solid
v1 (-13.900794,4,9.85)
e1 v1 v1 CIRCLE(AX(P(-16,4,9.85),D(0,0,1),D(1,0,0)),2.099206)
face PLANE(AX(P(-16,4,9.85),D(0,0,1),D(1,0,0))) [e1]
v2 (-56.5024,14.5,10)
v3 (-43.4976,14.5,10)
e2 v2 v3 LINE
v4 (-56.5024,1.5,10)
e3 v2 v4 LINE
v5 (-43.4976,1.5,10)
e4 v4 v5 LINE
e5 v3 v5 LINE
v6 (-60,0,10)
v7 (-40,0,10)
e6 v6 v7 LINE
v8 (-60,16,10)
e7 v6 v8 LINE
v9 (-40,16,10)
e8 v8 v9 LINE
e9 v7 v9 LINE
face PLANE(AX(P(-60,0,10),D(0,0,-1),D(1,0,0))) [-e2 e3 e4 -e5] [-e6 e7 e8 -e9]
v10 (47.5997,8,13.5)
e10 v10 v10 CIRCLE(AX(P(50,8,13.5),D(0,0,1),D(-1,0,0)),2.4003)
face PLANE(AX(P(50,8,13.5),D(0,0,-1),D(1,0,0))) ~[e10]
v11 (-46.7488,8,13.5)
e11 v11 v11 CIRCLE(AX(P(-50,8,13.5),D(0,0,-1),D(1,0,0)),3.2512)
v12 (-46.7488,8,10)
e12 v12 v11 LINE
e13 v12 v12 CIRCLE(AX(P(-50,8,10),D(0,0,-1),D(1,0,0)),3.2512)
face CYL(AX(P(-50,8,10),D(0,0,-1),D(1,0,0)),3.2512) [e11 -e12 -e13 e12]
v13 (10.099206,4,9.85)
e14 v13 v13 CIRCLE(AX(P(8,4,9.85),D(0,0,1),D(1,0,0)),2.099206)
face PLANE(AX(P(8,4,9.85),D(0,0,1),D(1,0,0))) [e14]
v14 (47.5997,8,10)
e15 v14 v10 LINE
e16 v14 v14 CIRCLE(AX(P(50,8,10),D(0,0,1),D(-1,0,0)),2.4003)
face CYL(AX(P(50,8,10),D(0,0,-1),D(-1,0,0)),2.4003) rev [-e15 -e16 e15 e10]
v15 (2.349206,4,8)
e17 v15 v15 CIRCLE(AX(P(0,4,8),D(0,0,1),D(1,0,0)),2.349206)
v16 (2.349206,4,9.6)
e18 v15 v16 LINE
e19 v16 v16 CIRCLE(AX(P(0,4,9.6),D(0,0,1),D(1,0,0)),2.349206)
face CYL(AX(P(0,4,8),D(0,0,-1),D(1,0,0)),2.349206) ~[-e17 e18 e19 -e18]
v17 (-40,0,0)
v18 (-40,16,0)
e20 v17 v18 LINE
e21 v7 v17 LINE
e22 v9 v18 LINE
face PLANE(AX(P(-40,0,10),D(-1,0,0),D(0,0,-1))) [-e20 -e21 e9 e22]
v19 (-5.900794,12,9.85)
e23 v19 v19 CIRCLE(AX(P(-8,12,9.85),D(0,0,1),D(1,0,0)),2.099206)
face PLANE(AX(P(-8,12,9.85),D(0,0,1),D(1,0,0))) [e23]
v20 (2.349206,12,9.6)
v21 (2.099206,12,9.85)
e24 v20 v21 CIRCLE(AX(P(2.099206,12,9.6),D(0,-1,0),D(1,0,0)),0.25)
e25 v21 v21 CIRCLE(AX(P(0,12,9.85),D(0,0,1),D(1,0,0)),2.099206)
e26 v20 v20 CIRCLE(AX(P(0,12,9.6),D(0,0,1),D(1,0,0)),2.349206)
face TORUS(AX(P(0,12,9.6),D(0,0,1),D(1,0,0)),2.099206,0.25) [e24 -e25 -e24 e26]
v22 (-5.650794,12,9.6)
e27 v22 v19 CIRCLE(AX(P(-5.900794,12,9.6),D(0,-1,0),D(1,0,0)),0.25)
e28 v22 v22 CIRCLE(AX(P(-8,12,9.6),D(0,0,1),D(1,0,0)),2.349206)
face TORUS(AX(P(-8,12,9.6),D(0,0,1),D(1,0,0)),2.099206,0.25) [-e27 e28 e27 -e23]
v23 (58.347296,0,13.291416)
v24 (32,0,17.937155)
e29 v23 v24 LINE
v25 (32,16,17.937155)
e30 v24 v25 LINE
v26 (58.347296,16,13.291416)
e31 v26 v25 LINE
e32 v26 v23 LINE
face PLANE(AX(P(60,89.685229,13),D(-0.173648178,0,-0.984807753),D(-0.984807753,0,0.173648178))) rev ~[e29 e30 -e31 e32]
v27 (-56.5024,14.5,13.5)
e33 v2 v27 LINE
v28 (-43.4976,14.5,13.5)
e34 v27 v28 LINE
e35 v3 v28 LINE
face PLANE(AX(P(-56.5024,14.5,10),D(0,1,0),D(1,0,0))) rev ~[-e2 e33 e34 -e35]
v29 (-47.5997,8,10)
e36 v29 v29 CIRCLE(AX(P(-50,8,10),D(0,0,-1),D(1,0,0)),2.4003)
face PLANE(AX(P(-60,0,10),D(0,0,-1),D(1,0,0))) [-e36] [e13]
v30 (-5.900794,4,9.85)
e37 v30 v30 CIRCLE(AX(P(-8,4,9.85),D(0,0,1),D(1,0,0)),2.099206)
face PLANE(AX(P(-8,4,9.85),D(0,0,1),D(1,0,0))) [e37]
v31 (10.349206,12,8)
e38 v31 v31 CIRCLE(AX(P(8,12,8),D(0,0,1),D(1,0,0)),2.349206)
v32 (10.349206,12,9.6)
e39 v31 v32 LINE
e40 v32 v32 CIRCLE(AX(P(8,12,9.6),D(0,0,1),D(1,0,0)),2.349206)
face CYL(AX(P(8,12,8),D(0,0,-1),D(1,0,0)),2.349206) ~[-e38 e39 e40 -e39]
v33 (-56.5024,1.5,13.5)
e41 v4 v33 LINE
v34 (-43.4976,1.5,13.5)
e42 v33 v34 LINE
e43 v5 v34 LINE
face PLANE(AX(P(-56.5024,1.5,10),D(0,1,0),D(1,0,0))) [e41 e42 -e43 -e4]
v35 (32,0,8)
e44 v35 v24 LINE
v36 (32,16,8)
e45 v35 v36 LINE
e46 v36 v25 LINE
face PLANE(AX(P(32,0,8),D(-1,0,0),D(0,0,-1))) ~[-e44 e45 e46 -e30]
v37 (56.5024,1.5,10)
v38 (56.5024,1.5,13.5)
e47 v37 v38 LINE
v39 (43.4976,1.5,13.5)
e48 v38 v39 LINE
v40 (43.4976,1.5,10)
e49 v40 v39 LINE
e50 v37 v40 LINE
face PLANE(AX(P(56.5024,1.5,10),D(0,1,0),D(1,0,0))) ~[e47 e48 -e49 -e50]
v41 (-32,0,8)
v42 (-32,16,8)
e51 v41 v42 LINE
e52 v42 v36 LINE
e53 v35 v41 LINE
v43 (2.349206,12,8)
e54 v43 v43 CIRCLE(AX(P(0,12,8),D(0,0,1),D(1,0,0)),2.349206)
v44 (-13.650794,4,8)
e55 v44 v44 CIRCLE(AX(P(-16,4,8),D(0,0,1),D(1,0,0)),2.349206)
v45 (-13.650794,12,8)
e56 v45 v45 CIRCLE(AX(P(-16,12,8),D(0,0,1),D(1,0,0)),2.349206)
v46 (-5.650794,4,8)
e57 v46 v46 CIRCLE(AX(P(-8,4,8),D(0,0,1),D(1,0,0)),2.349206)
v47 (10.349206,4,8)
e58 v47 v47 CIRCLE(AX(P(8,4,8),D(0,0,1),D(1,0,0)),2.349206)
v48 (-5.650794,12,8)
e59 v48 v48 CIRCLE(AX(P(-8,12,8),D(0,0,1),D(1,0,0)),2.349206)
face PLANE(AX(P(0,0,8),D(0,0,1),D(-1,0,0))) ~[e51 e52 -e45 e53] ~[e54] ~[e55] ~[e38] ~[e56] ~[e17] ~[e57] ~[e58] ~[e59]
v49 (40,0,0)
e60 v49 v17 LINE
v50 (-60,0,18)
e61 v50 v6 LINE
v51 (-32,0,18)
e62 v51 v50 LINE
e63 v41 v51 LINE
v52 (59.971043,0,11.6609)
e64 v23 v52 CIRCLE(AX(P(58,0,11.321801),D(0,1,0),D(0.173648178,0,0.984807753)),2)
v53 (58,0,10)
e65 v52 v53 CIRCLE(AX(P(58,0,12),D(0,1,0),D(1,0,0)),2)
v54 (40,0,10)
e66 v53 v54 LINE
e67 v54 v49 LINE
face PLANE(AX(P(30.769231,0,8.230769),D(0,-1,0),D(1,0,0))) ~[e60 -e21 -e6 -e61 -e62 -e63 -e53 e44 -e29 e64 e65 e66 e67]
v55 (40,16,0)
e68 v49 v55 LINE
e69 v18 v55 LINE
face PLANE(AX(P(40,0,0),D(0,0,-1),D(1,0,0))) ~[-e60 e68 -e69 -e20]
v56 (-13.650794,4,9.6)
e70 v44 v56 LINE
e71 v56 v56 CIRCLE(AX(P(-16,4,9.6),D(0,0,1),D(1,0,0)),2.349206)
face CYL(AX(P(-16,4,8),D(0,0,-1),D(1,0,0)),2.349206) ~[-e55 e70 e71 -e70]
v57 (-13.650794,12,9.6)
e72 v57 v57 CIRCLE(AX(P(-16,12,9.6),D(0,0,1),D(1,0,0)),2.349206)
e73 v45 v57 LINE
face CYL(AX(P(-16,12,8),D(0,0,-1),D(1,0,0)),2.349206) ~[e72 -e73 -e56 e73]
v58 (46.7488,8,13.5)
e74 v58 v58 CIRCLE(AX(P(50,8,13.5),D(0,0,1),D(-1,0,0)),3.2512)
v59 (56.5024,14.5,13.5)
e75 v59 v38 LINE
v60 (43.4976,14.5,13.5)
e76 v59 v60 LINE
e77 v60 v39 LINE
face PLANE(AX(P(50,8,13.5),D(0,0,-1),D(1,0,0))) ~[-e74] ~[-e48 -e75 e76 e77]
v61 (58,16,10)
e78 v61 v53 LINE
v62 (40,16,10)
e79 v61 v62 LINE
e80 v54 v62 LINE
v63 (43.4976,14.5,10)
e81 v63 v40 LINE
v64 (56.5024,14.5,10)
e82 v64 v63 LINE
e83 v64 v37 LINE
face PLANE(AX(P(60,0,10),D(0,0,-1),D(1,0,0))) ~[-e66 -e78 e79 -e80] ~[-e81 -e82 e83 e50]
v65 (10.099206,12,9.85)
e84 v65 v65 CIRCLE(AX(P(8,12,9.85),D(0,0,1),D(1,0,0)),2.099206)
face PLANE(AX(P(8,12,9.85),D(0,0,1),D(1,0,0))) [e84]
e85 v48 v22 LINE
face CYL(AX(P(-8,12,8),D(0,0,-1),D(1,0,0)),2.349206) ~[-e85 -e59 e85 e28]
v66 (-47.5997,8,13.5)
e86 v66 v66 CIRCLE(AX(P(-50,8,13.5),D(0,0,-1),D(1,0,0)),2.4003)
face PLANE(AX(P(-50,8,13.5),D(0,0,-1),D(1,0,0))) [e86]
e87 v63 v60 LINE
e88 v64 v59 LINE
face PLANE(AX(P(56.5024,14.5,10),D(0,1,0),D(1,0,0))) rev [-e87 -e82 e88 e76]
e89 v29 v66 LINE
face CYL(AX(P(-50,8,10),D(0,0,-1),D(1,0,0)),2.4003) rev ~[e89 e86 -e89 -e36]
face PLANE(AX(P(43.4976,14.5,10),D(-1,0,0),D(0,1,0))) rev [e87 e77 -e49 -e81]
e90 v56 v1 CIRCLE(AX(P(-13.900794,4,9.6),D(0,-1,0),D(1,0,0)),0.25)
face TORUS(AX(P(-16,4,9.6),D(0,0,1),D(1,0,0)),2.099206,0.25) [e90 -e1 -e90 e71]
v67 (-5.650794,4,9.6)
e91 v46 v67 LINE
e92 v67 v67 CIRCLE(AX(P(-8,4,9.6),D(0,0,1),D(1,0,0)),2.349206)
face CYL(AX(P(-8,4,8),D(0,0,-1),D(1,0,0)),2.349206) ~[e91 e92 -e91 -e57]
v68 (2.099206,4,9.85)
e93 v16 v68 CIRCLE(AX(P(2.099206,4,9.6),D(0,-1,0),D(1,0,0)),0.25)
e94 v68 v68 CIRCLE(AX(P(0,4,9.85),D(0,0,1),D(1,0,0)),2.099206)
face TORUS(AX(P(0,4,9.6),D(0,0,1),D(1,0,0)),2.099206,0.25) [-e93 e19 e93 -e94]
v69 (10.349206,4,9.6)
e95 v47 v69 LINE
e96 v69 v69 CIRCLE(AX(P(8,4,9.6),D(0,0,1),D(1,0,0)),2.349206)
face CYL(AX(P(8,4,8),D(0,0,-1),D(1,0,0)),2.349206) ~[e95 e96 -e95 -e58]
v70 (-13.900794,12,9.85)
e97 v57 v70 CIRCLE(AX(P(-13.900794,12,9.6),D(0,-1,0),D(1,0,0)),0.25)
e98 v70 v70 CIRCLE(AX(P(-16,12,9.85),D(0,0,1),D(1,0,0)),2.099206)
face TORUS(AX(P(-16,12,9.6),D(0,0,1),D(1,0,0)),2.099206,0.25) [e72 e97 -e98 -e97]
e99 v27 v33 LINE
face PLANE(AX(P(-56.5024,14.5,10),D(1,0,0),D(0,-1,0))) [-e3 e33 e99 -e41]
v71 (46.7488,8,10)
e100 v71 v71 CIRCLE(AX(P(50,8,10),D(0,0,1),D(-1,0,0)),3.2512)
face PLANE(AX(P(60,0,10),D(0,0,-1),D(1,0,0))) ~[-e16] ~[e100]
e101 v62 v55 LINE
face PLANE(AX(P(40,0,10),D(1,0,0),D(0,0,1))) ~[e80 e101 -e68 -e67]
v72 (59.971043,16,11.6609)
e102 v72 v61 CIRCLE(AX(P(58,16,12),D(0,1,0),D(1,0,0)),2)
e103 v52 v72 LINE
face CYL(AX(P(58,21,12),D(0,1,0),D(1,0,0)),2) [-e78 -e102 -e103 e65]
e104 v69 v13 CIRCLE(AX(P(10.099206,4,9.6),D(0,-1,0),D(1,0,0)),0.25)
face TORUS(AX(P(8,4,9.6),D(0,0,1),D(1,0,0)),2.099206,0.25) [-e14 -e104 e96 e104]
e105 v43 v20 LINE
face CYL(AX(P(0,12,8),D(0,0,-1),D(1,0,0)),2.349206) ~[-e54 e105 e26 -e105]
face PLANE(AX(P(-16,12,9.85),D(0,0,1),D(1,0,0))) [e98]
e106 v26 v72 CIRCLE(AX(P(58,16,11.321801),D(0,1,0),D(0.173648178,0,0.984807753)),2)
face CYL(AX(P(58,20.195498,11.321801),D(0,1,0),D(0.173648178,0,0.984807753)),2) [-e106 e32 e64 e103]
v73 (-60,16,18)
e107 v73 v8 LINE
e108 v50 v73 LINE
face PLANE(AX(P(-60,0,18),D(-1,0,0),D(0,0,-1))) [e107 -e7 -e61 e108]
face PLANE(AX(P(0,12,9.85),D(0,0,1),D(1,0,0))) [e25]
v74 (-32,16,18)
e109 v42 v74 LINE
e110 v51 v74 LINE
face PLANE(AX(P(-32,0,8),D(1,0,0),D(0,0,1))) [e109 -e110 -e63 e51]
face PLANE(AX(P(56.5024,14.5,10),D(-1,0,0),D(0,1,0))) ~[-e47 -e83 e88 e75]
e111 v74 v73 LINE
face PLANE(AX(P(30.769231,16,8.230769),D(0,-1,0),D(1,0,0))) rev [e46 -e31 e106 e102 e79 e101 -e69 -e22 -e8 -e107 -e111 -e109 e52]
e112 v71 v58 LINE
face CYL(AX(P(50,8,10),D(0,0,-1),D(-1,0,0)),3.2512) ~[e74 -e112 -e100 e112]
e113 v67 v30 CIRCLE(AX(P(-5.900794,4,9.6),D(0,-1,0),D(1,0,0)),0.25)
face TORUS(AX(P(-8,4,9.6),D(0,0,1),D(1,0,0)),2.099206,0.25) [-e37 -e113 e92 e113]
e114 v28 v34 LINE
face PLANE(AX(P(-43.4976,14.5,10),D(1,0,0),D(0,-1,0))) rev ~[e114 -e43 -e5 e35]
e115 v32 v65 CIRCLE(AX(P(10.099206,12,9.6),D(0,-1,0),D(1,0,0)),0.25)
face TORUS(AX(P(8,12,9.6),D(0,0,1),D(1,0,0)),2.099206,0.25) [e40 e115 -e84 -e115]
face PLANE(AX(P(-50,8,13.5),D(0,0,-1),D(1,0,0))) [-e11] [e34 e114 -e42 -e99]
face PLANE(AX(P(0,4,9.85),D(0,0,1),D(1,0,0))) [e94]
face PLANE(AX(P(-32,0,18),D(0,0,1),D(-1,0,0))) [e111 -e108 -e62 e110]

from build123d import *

# Parameters (mm, degrees)
F1_DEPTH    = 16
F2_W        = 13.0048
F2_H        = 13
F2_R        = 3.2512
F2_R_2      = 2.4003
F3_DEPTH    = 3.5
F5_R        = 2.3492063492
F6_DEPTH    = 1.85
F7_T1_DEPTH = 163.3704583371
F8_T1_DEPTH = 24.3909963118
F8_T3_DEPTH = 26
F9_R        = 0.25


# Not quite as in the source:
# - a fillet or chamfer that OpenCascade refuses, or shapes differently, is made with other operations: its cross-section is extruded or revolved along the edge and cut away or added
# - a feature names something its author has since deleted; it is built from what else it names


with BuildPart() as f1:
    # F0 (on Front) → F1 (new body)
    with BuildSketch(Plane.XZ):
        Polygon((-40, 0), (0, 0), (0, 8), (-32, 8), (-32, 18), (-60, 18), (-60, 10), (-40, 10), align=None)
    extrude(amount=-F1_DEPTH)

    # F2 (on face) → F3 (cut)
    with BuildSketch(Plane(origin=(0, 0, 10), x_dir=(1, 0, 0), z_dir=(0, 0, -1))):
        with Locations((-50, -8)):
            Rectangle(F2_W, F2_H)
        with Locations((-50, -8)):
            Circle(F2_R, mode=Mode.SUBTRACT)
        with Locations((-50, -8)):
            Circle(F2_R_2)
    extrude(amount=-F3_DEPTH, mode=Mode.SUBTRACT)

    # F4: F1 across face


with BuildPart() as f1_1:
    add(f1.part)
    add(f1.part.mirror(Plane(origin=(0, 8, 4), x_dir=(0, 1, 0), z_dir=(1, 0, 0))))

    # F5 (on face) → F6 (join)
    with BuildSketch(Plane.XY.offset(8)):
        with Locations((-16, 4)):
            Circle(F5_R)
        with Locations((-16, 12)):
            Circle(F5_R)
        with Locations((-8, 12)):
            Circle(F5_R)
        with Locations((-8, 4)):
            Circle(F5_R)
        with Locations((0, 4)):
            Circle(F5_R)
        with Locations((0, 12)):
            Circle(F5_R)
        with Locations((8, 12)):
            Circle(F5_R)
        with Locations((8, 4)):
            Circle(F5_R)
    extrude(amount=F6_DEPTH)

    # F7: chamfer of 5 x 28.3564090981 on 1 edges, made by hand

    # F7_s2 → F7_t1 (cut)
    with BuildSketch(Plane.XZ.offset(-89.6852291686)):
        Polygon((60, 13), (31.6435909019, 18), (60, 18), align=None)
    extrude(amount=F7_T1_DEPTH, mode=Mode.SUBTRACT)

    # F8: fillet of radius 2 on 2 edges, made by hand

    # F8_s2 → F8_t1 (cut)
    with BuildSketch(Plane.XZ.offset(-20.1954981559)):
        with BuildLine():
            ThreePointArc((58.3472963553, 13.2914162437), (59.5320888862, 12.607375957), (60, 11.3218007376))
            Line((60, 11.3218007376), (60, 13))
            Line((60, 13), (58.3472963553, 13.2914162437))
        make_face()
    extrude(amount=F8_T1_DEPTH, mode=Mode.SUBTRACT)

    # F8_s4 → F8_t3 (cut)
    with BuildSketch(Plane.XZ.offset(-21)):
        with BuildLine():
            ThreePointArc((60, 12), (59.4142135624, 10.5857864376), (58, 10))
            Line((58, 10), (60, 10))
            Line((60, 10), (60, 12))
        make_face()
    extrude(amount=F8_T3_DEPTH, mode=Mode.SUBTRACT)

    # F9
    f9_edges = [f1_1.edges().sort_by_distance(p)[0] for p in [
        (-18.349206, 4, 9.85),
        (-18.349206, 12, 9.85),
        (-10.349206, 12, 9.85),
        (-10.349206, 4, 9.85),
        (-2.349206, 4, 9.85),
        (-2.349206, 12, 9.85),
        (5.650794, 12, 9.85),
        (5.650794, 4, 9.85),
    ]]
    fillet(f9_edges, radius=F9_R)


solid = f1_1.part
